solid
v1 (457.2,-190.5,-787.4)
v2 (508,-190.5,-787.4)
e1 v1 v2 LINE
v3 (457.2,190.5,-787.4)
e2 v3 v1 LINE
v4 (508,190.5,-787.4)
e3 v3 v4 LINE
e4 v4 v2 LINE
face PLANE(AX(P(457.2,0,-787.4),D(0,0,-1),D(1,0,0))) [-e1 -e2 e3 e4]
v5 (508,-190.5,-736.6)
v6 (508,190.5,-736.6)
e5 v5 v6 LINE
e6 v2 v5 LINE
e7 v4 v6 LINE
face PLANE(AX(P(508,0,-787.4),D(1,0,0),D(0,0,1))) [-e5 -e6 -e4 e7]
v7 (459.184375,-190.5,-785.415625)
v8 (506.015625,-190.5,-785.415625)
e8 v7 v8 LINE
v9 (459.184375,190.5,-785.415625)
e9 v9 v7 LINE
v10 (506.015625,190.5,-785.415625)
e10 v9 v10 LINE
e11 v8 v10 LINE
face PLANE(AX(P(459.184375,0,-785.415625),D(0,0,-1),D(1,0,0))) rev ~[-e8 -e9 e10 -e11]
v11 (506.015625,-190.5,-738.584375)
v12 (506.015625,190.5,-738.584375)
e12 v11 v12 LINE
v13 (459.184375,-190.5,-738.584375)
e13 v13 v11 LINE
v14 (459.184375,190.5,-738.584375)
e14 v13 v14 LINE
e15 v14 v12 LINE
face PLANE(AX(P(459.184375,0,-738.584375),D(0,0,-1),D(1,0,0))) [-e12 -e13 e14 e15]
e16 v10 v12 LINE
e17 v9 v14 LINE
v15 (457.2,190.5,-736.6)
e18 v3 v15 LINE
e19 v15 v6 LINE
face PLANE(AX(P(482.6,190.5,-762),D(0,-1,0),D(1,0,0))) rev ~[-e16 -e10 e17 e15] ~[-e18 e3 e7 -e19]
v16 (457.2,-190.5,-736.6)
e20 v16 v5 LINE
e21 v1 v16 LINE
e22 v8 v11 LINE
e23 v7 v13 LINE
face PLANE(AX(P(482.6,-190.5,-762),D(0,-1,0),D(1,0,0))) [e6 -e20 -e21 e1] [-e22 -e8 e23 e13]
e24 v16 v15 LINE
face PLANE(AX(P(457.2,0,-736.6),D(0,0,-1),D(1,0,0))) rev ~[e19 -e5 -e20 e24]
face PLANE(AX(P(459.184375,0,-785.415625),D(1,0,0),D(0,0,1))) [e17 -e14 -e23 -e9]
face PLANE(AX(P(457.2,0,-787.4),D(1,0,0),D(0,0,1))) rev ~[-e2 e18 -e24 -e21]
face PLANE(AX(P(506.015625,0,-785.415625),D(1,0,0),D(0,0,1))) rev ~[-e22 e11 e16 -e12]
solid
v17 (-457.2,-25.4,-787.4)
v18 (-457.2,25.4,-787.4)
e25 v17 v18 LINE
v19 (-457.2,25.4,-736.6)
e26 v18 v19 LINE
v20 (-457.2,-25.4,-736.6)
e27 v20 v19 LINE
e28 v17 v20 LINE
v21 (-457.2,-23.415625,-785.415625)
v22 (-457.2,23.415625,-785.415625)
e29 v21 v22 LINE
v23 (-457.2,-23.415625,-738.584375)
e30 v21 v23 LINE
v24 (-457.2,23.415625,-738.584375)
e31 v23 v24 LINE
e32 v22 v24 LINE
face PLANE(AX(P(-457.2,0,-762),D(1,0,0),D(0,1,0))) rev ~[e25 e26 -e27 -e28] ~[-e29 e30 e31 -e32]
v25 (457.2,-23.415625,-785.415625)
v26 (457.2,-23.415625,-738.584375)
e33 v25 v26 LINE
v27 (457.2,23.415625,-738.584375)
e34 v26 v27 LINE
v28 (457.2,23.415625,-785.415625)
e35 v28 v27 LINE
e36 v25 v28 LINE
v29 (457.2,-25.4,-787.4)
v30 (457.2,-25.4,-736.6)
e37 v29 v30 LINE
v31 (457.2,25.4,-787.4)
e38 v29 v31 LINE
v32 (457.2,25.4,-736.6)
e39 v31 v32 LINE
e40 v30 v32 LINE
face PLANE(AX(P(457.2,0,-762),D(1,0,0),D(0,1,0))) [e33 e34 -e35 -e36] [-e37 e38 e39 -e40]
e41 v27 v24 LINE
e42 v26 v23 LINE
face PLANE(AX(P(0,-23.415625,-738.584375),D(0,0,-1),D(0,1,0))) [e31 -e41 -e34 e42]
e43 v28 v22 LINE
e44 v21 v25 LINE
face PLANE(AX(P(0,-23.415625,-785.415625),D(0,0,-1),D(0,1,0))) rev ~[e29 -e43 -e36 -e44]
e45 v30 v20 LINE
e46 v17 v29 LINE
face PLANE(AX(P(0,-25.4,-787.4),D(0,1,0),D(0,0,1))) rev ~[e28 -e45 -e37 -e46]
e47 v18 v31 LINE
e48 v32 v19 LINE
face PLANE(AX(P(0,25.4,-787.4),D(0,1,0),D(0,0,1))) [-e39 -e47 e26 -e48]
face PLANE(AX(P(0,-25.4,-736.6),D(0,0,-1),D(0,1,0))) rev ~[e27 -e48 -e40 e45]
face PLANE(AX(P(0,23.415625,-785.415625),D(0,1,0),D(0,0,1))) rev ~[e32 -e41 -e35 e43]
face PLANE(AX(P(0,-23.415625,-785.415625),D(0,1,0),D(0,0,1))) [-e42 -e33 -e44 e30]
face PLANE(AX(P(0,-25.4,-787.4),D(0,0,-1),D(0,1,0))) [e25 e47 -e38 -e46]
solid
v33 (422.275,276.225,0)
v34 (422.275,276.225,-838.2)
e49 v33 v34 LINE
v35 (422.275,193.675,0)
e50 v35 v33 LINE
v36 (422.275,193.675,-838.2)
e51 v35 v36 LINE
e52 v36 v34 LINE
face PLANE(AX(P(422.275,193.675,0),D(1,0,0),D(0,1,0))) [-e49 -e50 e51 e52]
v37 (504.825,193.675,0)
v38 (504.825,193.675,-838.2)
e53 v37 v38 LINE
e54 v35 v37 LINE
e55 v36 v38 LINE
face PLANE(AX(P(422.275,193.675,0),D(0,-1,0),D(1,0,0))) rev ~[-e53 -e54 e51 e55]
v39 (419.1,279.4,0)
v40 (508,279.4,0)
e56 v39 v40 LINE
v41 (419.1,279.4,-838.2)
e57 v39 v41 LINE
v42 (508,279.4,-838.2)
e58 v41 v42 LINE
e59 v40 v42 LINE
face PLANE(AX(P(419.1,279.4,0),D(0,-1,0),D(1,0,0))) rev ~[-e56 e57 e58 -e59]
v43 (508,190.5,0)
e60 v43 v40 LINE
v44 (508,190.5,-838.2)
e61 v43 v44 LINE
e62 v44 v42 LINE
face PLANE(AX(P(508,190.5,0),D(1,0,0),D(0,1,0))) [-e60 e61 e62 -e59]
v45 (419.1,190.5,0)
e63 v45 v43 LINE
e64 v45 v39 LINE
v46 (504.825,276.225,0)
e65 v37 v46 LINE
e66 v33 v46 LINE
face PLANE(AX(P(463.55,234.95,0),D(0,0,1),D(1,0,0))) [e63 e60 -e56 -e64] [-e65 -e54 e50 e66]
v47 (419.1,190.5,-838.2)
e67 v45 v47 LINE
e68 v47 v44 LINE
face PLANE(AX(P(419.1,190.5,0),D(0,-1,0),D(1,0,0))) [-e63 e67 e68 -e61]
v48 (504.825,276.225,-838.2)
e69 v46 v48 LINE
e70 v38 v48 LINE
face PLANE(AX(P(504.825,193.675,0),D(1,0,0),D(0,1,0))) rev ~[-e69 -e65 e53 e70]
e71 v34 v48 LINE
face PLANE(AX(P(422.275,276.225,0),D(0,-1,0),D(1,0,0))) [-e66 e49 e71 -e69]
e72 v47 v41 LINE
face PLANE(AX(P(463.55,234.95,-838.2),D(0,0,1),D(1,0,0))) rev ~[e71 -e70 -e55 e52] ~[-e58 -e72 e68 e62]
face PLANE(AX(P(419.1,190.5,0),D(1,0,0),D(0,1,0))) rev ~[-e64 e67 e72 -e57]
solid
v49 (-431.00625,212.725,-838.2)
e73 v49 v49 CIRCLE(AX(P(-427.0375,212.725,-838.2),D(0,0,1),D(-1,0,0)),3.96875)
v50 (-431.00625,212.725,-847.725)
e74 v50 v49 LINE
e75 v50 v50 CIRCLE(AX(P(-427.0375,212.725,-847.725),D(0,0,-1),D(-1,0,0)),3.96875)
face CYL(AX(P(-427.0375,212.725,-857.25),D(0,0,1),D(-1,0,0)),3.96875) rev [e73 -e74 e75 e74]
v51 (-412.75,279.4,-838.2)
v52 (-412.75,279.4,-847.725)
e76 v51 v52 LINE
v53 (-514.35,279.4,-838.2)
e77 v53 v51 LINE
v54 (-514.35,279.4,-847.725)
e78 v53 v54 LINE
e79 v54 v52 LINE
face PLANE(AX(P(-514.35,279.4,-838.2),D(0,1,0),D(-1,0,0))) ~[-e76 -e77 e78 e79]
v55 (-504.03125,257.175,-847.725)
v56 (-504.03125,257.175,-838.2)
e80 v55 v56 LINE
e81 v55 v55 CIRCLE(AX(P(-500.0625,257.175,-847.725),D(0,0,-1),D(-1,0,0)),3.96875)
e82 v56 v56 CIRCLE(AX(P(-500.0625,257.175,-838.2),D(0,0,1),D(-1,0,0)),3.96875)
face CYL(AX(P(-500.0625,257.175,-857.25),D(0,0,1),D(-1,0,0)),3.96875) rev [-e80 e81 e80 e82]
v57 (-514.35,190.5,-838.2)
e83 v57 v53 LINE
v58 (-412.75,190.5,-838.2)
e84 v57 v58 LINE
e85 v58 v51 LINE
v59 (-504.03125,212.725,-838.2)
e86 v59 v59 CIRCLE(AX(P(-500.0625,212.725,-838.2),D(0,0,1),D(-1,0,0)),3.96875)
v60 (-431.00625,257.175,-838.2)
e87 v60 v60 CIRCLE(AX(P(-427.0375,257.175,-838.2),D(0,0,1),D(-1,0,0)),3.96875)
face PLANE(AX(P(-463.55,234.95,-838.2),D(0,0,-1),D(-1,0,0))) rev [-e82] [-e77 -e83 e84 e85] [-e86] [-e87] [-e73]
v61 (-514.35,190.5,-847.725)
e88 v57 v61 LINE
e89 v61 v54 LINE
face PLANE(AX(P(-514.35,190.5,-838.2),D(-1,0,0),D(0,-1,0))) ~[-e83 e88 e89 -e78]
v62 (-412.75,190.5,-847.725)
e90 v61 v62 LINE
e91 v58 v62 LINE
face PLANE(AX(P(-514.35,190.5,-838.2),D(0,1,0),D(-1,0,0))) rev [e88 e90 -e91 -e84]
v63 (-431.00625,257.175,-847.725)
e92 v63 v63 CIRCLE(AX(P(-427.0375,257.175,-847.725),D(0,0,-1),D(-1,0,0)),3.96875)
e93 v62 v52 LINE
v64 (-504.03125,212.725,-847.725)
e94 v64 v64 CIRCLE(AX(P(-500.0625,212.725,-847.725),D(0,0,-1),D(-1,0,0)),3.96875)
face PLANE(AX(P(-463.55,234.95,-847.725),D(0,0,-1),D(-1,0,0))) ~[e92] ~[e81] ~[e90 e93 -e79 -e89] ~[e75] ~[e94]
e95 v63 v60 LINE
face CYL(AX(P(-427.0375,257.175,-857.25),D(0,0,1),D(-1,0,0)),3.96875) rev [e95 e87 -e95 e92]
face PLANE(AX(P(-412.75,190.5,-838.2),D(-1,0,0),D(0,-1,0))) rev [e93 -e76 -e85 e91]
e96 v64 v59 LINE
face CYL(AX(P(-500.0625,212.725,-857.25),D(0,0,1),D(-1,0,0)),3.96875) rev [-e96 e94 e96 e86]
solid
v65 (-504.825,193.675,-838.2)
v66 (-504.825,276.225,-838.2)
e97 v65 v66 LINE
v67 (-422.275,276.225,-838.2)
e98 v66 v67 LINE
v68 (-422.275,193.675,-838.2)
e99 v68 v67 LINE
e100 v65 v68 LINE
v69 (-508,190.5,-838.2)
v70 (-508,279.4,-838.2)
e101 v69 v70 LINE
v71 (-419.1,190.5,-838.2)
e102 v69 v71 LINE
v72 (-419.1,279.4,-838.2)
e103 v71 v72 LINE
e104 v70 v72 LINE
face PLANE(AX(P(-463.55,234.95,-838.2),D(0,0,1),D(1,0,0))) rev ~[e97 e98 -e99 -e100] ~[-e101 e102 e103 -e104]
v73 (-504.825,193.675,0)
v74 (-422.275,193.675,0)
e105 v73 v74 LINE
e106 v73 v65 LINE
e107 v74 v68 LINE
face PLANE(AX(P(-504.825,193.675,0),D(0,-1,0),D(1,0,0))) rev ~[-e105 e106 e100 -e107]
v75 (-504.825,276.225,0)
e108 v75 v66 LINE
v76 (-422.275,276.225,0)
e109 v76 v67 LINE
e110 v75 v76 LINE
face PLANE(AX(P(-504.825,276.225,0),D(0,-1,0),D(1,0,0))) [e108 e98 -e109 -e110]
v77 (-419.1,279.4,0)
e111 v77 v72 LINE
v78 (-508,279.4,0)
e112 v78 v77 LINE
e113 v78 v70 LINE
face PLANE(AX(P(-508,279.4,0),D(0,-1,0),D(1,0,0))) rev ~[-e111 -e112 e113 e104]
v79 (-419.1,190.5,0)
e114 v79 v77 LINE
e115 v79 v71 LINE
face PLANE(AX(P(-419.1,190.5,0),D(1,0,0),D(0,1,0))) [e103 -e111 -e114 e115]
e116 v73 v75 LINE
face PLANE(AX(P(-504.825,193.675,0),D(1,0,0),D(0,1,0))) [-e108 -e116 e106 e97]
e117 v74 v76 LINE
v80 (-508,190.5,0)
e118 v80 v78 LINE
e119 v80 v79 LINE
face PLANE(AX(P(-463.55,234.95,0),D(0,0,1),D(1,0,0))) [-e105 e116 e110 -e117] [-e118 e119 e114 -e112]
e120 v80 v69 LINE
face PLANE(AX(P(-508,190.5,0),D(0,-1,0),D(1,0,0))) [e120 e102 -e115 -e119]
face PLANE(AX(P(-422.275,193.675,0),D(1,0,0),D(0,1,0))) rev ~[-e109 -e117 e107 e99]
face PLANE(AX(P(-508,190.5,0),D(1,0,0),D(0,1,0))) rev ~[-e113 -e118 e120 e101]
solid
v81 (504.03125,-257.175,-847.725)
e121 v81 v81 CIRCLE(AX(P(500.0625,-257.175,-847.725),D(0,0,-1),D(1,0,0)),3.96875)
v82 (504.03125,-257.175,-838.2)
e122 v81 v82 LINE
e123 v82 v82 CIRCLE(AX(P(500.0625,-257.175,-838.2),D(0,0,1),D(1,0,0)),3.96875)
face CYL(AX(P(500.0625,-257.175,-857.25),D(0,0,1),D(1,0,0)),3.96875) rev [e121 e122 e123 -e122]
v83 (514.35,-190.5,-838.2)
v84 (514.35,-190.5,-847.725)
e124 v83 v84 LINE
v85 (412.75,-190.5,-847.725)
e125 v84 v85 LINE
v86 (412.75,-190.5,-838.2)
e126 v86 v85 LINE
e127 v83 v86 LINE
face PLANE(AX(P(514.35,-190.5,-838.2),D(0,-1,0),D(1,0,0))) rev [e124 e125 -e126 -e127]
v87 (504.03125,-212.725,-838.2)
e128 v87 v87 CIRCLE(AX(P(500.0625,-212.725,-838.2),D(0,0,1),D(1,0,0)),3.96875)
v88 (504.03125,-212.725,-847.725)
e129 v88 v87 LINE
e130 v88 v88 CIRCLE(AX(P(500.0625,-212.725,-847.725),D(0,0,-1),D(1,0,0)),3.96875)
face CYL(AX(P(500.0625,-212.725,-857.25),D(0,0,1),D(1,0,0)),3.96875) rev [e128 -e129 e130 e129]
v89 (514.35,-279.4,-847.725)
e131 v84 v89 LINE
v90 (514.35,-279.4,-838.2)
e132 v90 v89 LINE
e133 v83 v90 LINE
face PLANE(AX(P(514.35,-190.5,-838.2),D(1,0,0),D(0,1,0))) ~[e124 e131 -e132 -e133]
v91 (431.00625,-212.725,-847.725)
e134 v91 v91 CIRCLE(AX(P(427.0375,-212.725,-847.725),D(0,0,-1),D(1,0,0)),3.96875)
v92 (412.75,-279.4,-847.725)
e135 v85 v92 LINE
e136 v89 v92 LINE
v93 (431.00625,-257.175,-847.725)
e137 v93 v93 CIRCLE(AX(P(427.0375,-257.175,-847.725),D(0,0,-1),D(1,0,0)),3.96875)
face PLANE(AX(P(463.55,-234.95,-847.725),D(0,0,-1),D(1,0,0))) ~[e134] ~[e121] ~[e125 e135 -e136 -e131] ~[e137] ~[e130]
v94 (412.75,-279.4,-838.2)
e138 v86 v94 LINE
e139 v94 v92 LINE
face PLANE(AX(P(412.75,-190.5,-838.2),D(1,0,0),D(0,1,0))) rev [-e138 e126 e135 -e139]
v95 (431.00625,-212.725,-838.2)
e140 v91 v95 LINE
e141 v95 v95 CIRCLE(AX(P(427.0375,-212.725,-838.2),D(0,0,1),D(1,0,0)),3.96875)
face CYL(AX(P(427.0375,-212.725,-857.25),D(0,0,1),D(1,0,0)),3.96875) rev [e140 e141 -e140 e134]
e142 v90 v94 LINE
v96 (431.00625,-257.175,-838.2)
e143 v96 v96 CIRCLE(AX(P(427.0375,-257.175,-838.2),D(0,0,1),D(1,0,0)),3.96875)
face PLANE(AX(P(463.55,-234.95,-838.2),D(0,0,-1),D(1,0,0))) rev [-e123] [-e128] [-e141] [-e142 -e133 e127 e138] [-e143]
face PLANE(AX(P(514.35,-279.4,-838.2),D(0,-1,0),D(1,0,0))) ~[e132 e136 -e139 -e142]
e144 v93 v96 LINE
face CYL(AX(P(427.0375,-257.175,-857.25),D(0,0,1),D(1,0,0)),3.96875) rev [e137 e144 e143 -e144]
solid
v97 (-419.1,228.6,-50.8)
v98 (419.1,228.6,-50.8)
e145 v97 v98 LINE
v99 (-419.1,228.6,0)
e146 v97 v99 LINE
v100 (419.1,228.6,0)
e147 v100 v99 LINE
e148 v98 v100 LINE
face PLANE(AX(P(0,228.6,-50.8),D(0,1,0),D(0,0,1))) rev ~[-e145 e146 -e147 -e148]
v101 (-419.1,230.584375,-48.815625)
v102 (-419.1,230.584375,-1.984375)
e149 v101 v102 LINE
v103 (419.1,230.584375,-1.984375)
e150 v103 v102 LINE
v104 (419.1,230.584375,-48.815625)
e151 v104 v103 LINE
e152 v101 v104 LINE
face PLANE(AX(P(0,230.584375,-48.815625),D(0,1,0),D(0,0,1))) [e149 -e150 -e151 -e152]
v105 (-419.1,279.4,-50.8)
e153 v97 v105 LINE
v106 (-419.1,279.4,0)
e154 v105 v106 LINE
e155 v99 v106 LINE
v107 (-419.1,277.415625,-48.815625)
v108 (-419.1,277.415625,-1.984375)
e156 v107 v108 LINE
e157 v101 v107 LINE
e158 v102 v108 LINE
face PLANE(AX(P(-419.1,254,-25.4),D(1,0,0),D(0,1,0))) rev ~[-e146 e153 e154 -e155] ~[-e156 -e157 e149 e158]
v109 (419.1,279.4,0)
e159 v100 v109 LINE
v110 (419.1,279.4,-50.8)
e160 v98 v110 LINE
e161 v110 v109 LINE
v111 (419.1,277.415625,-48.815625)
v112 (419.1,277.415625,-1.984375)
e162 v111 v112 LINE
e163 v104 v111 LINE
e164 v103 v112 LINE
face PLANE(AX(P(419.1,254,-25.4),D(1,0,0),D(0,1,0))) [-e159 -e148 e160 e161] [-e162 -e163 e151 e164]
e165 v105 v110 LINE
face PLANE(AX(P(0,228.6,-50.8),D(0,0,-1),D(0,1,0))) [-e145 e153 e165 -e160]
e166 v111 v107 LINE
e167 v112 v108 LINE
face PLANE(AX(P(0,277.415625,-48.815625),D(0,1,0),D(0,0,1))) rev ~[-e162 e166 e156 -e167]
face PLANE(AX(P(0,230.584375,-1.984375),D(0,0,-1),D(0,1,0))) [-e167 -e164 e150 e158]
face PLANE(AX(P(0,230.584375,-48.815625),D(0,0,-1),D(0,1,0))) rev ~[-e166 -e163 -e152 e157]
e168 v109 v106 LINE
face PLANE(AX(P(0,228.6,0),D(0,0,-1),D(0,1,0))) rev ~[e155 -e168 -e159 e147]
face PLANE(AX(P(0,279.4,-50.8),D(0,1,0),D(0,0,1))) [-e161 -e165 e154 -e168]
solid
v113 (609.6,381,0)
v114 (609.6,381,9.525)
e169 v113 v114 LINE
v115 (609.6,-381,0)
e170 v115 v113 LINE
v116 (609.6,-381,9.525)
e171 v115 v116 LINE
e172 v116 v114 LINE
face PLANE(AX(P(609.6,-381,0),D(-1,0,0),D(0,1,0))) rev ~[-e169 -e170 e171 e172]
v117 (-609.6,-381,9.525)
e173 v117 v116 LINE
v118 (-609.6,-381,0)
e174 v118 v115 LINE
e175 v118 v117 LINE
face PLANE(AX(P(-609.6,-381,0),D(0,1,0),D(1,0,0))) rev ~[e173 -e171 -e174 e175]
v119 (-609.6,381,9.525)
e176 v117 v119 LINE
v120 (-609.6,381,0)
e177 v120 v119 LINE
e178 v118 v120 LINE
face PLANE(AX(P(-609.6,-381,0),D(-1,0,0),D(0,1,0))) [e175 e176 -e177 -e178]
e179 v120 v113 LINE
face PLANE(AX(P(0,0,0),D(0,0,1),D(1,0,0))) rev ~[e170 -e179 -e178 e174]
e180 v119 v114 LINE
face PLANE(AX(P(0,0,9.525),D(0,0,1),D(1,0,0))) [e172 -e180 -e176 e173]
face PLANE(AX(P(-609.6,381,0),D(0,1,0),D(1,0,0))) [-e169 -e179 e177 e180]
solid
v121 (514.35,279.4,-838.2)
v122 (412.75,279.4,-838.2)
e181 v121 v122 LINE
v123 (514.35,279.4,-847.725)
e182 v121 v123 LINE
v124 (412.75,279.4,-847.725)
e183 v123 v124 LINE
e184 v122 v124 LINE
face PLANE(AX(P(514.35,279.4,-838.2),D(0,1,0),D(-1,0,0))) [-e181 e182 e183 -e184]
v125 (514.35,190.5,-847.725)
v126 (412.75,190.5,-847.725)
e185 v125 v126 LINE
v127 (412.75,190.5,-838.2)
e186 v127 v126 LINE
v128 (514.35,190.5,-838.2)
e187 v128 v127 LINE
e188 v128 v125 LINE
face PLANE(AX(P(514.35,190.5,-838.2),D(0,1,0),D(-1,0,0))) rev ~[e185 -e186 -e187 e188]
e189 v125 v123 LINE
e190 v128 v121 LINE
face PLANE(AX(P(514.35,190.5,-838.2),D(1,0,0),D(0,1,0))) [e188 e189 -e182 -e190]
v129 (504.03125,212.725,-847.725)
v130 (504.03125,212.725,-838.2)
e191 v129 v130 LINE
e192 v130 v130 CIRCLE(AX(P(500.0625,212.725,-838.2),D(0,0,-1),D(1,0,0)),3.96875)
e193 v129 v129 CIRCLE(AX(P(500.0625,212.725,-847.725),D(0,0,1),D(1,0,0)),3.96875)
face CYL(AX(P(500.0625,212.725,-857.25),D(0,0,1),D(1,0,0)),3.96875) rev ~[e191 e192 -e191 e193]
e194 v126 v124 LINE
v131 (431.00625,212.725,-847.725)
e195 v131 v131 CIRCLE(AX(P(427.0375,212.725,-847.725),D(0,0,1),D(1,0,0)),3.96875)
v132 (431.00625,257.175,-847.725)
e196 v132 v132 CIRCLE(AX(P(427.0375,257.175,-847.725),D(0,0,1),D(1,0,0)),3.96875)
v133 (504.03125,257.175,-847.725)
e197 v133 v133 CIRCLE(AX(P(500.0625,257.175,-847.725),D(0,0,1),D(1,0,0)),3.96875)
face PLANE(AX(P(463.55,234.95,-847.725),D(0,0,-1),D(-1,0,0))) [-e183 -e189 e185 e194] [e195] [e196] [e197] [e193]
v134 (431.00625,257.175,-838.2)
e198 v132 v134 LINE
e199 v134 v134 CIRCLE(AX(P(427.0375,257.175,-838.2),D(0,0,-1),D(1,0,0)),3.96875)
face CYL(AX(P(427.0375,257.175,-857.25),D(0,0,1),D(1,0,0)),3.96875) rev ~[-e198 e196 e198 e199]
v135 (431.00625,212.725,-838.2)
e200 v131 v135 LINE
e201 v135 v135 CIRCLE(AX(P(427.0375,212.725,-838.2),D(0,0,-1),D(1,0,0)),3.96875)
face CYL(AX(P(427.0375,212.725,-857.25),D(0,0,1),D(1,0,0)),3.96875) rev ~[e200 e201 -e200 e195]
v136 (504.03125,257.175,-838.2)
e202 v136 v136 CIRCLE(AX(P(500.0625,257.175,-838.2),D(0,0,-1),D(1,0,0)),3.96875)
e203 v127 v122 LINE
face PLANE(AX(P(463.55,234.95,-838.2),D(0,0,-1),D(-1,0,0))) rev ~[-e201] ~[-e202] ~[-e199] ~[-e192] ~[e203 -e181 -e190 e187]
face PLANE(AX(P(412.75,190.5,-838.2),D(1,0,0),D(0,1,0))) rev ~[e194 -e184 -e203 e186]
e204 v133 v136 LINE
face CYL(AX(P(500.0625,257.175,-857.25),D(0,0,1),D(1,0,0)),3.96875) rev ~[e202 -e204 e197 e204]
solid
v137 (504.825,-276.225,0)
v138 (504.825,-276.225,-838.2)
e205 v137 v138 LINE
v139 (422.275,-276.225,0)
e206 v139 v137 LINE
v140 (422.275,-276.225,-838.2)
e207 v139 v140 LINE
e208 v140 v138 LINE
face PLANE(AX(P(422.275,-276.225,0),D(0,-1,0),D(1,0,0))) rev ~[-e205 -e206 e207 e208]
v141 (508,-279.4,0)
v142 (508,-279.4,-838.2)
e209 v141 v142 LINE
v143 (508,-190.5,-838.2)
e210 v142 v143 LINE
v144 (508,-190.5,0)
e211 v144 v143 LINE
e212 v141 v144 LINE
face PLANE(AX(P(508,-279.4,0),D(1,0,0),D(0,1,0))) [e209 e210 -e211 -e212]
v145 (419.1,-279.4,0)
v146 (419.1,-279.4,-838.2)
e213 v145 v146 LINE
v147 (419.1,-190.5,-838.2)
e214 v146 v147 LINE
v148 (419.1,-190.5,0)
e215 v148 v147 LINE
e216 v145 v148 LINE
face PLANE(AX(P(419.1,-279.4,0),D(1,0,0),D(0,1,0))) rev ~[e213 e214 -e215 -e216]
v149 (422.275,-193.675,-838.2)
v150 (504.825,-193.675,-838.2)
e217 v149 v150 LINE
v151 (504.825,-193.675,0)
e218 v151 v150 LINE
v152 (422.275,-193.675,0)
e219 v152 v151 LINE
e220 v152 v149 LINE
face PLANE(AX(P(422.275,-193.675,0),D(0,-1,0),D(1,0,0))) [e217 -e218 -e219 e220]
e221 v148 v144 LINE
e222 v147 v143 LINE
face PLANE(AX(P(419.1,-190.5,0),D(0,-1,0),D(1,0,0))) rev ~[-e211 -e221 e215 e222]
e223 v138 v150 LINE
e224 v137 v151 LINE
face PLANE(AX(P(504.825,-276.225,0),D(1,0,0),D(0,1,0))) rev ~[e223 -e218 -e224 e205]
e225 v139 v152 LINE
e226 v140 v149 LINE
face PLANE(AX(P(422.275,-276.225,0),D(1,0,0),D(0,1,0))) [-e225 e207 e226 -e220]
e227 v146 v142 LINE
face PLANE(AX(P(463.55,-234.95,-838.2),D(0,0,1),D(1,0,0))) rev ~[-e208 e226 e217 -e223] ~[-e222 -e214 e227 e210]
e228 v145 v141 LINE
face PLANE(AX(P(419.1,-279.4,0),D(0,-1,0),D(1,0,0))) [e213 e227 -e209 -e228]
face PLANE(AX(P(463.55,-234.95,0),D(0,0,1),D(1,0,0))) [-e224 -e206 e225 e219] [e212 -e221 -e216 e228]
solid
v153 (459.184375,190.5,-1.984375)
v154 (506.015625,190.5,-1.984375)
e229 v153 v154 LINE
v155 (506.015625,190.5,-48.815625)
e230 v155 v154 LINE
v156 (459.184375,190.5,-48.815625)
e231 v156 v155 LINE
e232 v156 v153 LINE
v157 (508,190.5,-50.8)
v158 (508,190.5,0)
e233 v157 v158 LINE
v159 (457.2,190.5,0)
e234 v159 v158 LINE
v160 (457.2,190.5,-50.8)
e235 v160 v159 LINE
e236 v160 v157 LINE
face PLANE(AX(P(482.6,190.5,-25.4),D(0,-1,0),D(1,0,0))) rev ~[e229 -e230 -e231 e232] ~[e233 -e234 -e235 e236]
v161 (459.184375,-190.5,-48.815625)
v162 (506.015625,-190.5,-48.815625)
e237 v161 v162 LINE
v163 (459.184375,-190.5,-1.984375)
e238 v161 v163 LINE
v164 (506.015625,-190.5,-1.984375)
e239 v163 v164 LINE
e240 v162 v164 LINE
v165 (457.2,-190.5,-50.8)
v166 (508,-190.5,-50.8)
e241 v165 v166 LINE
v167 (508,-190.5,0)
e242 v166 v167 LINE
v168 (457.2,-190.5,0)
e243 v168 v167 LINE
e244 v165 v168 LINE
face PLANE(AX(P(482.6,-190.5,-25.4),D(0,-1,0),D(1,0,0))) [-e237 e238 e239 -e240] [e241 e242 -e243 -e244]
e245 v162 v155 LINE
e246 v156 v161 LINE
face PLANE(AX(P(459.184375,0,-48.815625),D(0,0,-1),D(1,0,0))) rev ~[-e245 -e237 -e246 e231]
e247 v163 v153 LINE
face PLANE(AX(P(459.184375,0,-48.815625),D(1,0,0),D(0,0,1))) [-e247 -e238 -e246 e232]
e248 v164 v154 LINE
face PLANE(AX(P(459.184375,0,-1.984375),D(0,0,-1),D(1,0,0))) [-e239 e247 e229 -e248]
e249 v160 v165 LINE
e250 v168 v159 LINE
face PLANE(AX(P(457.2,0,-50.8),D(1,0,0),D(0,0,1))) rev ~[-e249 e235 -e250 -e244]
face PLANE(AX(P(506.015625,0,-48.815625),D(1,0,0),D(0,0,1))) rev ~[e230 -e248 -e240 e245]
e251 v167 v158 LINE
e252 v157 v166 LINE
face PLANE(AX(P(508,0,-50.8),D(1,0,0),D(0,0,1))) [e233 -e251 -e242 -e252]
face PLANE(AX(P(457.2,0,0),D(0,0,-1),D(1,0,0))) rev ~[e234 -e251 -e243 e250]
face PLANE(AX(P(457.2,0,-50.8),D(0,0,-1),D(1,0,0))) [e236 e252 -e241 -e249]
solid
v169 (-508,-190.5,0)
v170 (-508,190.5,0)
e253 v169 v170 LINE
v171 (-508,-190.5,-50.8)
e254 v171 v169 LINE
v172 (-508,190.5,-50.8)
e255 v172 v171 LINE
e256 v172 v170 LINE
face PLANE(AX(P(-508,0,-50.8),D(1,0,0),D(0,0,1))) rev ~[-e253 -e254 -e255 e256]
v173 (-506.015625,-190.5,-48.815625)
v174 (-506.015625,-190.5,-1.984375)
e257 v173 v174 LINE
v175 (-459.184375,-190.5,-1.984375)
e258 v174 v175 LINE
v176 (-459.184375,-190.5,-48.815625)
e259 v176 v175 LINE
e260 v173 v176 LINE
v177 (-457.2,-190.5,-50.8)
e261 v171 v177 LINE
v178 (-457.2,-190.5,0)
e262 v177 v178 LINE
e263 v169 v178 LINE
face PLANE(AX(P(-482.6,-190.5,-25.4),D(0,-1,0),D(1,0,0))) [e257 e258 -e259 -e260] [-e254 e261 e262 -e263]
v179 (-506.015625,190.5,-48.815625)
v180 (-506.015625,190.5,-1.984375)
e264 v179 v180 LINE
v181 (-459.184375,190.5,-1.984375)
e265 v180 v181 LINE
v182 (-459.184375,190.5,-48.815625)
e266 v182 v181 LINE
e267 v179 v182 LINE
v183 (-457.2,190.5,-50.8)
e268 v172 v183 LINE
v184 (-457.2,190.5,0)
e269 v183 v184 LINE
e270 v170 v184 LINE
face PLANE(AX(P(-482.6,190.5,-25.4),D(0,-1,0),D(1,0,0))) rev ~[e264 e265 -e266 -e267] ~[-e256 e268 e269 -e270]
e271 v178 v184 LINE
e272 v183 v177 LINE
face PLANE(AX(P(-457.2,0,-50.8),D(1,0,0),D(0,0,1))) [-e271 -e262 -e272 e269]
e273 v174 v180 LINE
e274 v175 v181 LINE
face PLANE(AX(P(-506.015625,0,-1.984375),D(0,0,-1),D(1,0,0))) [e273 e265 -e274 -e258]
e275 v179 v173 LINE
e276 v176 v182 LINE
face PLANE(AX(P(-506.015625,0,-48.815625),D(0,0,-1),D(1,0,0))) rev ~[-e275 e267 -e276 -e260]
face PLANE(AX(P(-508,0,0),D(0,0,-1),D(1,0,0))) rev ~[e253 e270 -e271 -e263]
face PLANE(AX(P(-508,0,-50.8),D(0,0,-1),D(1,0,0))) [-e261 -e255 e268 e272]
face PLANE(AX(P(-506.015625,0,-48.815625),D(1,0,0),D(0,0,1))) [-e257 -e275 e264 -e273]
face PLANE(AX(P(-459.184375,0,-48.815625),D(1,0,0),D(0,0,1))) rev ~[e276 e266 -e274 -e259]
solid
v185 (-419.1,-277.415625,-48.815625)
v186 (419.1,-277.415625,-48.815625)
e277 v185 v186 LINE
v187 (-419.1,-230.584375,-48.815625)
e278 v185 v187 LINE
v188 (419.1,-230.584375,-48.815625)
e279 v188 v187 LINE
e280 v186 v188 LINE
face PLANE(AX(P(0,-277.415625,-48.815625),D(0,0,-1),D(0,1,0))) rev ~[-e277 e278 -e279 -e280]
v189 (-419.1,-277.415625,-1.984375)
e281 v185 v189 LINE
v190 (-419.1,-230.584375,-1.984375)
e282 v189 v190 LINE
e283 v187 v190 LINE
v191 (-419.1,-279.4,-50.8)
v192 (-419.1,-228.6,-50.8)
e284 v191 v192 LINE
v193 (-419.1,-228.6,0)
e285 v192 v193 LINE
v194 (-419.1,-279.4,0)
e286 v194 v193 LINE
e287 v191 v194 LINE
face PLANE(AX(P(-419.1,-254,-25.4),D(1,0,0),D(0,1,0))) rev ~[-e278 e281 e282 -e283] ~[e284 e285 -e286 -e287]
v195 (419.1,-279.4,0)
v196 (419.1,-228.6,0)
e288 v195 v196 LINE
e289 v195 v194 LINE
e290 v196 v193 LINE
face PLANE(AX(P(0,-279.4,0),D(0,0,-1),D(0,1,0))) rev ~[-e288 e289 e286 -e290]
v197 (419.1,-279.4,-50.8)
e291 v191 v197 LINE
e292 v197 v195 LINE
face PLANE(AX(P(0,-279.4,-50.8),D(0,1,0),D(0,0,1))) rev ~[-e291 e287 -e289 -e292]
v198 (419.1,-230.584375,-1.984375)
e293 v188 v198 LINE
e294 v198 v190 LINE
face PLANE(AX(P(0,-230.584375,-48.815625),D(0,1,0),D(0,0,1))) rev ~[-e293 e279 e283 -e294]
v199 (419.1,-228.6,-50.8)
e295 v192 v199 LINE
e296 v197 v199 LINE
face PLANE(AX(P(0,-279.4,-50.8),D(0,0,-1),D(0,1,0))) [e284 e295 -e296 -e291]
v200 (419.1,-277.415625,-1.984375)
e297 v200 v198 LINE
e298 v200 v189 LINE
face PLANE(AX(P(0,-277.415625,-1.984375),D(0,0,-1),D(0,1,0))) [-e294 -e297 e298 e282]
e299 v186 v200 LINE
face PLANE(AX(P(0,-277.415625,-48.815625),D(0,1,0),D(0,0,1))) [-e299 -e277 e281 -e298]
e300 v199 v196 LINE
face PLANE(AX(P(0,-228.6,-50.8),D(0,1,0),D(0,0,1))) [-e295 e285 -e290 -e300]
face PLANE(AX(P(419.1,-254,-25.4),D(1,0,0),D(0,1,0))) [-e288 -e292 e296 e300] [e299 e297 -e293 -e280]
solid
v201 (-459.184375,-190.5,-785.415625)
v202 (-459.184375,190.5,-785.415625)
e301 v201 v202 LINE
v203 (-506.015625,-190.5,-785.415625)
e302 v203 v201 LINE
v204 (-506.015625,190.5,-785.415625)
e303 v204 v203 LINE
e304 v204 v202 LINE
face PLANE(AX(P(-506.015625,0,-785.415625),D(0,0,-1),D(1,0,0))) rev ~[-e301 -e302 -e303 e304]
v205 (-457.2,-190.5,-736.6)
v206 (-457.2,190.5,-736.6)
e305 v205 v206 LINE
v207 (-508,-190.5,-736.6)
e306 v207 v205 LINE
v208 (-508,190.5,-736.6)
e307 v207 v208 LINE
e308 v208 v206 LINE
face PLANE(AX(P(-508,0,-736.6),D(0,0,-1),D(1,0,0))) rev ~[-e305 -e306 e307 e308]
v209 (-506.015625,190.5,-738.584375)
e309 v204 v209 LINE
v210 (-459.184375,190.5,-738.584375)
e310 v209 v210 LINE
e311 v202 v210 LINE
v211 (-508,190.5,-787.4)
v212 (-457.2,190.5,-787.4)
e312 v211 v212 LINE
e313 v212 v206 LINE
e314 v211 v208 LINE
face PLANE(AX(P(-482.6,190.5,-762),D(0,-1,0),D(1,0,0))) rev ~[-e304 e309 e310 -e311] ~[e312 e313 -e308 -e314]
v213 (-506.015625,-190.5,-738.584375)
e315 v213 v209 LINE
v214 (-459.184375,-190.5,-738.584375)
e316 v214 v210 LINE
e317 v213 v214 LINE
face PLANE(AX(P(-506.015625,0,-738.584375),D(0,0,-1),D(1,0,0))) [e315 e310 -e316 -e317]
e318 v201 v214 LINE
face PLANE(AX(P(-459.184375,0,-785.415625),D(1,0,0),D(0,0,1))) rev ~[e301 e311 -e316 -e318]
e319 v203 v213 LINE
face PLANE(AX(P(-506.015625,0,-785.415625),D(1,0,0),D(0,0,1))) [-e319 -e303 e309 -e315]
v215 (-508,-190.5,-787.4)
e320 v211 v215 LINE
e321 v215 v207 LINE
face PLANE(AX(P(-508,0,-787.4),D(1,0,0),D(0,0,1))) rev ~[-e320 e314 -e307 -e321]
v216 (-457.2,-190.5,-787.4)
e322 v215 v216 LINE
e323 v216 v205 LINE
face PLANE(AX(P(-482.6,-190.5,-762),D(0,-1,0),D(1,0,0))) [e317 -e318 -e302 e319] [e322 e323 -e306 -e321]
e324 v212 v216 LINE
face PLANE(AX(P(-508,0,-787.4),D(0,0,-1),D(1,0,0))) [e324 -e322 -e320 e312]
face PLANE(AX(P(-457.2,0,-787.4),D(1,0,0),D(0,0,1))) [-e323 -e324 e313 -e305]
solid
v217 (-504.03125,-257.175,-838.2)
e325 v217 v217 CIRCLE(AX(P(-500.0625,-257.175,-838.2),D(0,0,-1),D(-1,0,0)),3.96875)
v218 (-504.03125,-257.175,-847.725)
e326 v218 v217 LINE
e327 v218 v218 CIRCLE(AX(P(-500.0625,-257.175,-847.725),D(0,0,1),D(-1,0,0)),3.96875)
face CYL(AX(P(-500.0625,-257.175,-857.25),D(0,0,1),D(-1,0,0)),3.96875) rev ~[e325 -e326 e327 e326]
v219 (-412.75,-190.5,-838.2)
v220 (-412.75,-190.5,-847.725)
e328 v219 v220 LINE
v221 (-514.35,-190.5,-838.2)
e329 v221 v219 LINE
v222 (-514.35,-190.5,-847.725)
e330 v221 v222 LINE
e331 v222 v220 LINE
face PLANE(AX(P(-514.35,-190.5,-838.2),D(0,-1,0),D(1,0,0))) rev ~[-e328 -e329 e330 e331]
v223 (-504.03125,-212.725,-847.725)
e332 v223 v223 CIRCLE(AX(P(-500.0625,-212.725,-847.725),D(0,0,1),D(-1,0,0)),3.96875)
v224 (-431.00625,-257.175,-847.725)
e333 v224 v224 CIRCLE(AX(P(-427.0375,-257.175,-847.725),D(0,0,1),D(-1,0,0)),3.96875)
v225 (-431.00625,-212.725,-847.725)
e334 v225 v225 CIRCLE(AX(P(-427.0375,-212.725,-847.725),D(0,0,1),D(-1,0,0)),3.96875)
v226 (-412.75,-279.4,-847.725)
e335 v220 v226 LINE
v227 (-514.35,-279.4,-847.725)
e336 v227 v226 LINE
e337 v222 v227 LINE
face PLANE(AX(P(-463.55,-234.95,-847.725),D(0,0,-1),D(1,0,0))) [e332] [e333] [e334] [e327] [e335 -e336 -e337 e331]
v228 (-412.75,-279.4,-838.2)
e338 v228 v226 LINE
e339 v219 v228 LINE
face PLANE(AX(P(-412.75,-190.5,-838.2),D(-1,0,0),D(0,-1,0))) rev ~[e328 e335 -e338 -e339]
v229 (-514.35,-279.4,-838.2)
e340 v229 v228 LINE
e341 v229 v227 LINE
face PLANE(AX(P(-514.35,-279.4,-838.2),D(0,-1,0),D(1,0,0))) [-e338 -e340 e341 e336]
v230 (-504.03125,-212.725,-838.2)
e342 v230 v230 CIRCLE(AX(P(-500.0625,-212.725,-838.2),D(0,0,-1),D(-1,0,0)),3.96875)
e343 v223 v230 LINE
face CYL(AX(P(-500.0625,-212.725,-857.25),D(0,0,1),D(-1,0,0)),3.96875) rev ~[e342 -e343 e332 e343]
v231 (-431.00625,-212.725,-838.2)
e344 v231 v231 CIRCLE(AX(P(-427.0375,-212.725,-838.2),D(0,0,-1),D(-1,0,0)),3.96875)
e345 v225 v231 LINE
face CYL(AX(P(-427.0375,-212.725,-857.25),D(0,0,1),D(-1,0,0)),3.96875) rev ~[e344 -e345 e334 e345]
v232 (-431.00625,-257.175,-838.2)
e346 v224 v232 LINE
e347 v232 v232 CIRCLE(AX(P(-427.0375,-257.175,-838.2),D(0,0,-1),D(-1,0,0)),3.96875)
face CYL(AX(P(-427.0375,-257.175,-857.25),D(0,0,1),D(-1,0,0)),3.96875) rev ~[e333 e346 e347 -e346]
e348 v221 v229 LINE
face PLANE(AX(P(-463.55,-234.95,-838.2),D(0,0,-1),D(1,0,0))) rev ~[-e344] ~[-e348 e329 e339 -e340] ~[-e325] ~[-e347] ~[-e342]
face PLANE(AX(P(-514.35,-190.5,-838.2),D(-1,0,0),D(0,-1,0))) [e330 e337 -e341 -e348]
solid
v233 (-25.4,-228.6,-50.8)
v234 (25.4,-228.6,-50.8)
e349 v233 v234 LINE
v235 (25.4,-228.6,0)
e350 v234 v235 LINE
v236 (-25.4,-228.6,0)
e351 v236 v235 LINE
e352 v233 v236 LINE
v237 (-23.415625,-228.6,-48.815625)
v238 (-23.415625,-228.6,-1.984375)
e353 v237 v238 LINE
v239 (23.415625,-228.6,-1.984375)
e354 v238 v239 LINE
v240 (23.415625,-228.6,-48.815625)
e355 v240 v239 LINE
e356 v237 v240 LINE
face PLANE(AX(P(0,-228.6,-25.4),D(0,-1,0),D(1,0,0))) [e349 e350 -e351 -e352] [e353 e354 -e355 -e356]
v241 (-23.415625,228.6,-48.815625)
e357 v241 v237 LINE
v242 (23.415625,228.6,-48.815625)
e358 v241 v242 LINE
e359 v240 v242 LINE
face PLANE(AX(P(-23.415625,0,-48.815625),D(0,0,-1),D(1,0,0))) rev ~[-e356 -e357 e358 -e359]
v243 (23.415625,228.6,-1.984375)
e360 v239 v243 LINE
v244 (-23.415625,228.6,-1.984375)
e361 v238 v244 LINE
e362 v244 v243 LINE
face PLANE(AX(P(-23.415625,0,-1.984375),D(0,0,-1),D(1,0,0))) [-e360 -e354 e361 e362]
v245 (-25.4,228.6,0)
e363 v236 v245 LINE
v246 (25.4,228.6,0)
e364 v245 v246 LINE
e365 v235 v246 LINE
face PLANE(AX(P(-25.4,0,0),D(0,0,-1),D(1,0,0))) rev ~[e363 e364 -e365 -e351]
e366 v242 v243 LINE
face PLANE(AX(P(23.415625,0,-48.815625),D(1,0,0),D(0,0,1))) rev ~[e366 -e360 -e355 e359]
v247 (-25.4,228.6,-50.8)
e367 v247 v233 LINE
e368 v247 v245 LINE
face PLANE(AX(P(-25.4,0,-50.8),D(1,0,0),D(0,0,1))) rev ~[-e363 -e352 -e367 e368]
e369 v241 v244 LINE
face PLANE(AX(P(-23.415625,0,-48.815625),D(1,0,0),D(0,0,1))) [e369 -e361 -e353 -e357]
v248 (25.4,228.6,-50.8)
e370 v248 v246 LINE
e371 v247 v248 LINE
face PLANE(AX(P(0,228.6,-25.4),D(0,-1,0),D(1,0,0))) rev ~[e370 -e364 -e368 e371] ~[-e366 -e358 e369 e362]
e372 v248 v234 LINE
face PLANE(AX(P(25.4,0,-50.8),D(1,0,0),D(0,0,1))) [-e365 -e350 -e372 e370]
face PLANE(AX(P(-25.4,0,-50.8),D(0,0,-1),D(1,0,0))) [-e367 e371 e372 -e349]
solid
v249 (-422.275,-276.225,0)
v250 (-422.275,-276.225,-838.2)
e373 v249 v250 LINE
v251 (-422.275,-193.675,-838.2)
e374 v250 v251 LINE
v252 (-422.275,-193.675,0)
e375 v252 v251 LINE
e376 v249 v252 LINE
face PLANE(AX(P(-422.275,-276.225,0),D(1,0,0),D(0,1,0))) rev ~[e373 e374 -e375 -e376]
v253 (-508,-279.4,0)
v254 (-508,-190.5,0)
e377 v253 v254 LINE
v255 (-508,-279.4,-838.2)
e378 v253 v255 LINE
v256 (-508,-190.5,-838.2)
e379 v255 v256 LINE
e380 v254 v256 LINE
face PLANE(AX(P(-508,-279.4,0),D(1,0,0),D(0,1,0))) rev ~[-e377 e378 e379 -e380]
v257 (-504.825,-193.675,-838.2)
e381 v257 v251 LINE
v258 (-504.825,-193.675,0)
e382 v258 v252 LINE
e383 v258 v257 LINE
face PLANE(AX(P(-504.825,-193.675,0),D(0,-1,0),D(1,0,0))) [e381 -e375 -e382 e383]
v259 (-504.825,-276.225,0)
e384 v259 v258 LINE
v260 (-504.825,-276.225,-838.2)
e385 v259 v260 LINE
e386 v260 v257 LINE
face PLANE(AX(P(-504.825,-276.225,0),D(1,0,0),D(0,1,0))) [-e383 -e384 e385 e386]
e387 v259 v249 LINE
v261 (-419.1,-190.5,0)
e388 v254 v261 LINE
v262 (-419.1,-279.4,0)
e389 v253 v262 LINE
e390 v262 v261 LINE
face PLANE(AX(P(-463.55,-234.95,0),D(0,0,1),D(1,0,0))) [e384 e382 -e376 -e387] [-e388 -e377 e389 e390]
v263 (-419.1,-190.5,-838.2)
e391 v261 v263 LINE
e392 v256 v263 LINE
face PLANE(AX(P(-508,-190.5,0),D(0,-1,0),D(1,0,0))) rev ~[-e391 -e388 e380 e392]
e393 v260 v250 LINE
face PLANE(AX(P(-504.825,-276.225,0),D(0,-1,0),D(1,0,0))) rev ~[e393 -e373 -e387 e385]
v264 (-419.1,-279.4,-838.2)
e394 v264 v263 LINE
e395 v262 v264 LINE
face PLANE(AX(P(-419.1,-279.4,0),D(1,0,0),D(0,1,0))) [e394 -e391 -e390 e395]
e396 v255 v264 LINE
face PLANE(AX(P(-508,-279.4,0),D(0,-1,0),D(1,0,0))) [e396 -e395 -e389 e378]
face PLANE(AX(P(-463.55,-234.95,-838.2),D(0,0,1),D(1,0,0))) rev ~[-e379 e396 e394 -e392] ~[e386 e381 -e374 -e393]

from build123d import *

# Parameters (mm, degrees)
F0_W           = 88.9
F0_H           = 88.9
F0_W_2         = 82.55
F0_H_2         = 82.55
F1_DEPTH       = 838.2
F2_W           = 50.8
F2_H           = 50.8
F2_W_2         = 46.83125
F2_H_2         = 46.83125
F3_DEPTH       = 419.1
F3_DEPTH_BACK  = 419.1
F4_W           = 50.8
F4_H           = 50.8
F4_W_2         = 46.83125
F4_H_2         = 46.83125
F5_DEPTH       = 190.5
F5_DEPTH_BACK  = 190.5
F6_W           = 50.8
F6_H           = 50.8
F6_W_2         = 46.83125
F6_H_2         = 46.83125
F7_DEPTH       = 457.2
F7_DEPTH_BACK  = 457.2
F8_W           = 1219.2
F8_H           = 762
F9_DEPTH       = 9.525
F11_W          = 101.6
F11_H          = 88.9
F12_DEPTH      = 9.525
F15_D          = 7.9375
F15_DEPTH      = 9.525
F15_TIP        = 2.3846655818
F18_W          = 50.8
F18_H          = 50.8
F18_W_2        = 46.83125
F18_H_2        = 46.83125
F19_DEPTH      = 228.6
F19_DEPTH_BACK = 228.6


# Not quite as in the source:
# - a length typed as a fraction of an inch, garbled in the dataset ("3 / 203.2 mm" for 3/8 in), is restored


with BuildPart() as f1:
    # F0 (on Top) → F1 (new body)
    with BuildSketch(Plane.XY):
        with Locations((463.55, -234.95)):
            Rectangle(F0_W, F0_H)
        with Locations((463.55, -234.95)):
            Rectangle(F0_W_2, F0_H_2, mode=Mode.SUBTRACT)
    extrude(amount=-F1_DEPTH)


with BuildPart() as f1b:
    # F0 (on Top) → F1, piece 2 (new body)
    with BuildSketch(Plane.XY):
        with Locations((463.55, 234.95)):
            Rectangle(F0_W, F0_H)
        with Locations((463.55, 234.95)):
            Rectangle(F0_W_2, F0_H_2, mode=Mode.SUBTRACT)
    extrude(amount=-F1_DEPTH)


with BuildPart() as f1c:
    # F0 (on Top) → F1, piece 3 (new body)
    with BuildSketch(Plane.XY):
        with Locations((-463.55, -234.95)):
            Rectangle(F0_W, F0_H)
        with Locations((-463.55, -234.95)):
            Rectangle(F0_W_2, F0_H_2, mode=Mode.SUBTRACT)
    extrude(amount=-F1_DEPTH)


with BuildPart() as f1d:
    # F0 (on Top) → F1, piece 4 (new body)
    with BuildSketch(Plane.XY):
        with Locations((-463.55, 234.95)):
            Rectangle(F0_W, F0_H)
        with Locations((-463.55, 234.95)):
            Rectangle(F0_W_2, F0_H_2, mode=Mode.SUBTRACT)
    extrude(amount=-F1_DEPTH)


with BuildPart() as f3:
    # F2 (on Right) → F3 (new body, two sides)
    with BuildSketch(Plane.YZ) as f3_sk:
        with Locations((-254, -25.4)):
            Rectangle(F2_W, F2_H)
        with Locations((-254, -25.4)):
            Rectangle(F2_W_2, F2_H_2, mode=Mode.SUBTRACT)
    extrude(amount=F3_DEPTH)
    extrude(f3_sk.sketch, amount=-F3_DEPTH_BACK)


with BuildPart() as f3b:
    # F2 (on Right) → F3, piece 2 (new body, two sides)
    with BuildSketch(Plane.YZ) as f3_2_sk:
        with Locations((254, -25.4)):
            Rectangle(F2_W, F2_H)
        with Locations((254, -25.4)):
            Rectangle(F2_W_2, F2_H_2, mode=Mode.SUBTRACT)
    extrude(amount=F3_DEPTH)
    extrude(f3_2_sk.sketch, amount=-F3_DEPTH_BACK)


with BuildPart() as f5:
    # F4 (on Front) → F5 (new body, two sides)
    with BuildSketch(Plane.XZ) as f5_sk:
        with Locations((-482.6, -25.4)):
            Rectangle(F4_W, F4_H)
        with Locations((-482.6, -25.4)):
            Rectangle(F4_W_2, F4_H_2, mode=Mode.SUBTRACT)
    extrude(amount=F5_DEPTH)
    extrude(f5_sk.sketch, amount=-F5_DEPTH_BACK)


with BuildPart() as f5b:
    # F4 (on Front) → F5, piece 2 (new body, two sides)
    with BuildSketch(Plane.XZ) as f5_2_sk:
        with Locations((482.6, -25.4)):
            Rectangle(F4_W, F4_H)
        with Locations((482.6, -25.4)):
            Rectangle(F4_W_2, F4_H_2, mode=Mode.SUBTRACT)
    extrude(amount=F5_DEPTH)
    extrude(f5_2_sk.sketch, amount=-F5_DEPTH_BACK)


with BuildPart() as f5c:
    # F4 (on Front) → F5, piece 3 (new body, two sides)
    with BuildSketch(Plane.XZ) as f5_3_sk:
        with Locations((-482.6, -762)):
            Rectangle(F4_W, F4_H)
        with Locations((-482.6, -762)):
            Rectangle(F4_W_2, F4_H_2, mode=Mode.SUBTRACT)
    extrude(amount=F5_DEPTH)
    extrude(f5_3_sk.sketch, amount=-F5_DEPTH_BACK)


with BuildPart() as f5d:
    # F4 (on Front) → F5, piece 4 (new body, two sides)
    with BuildSketch(Plane.XZ) as f5_4_sk:
        with Locations((482.6, -762)):
            Rectangle(F4_W, F4_H)
        with Locations((482.6, -762)):
            Rectangle(F4_W_2, F4_H_2, mode=Mode.SUBTRACT)
    extrude(amount=F5_DEPTH)
    extrude(f5_4_sk.sketch, amount=-F5_DEPTH_BACK)


with BuildPart() as f7:
    # F6 (on Right) → F7 (new body, two sides)
    with BuildSketch(Plane.YZ) as f7_sk:
        with Locations((0, -762)):
            Rectangle(F6_W, F6_H)
        with Locations((0, -762)):
            Rectangle(F6_W_2, F6_H_2, mode=Mode.SUBTRACT)
    extrude(amount=F7_DEPTH)
    extrude(f7_sk.sketch, amount=-F7_DEPTH_BACK)


with BuildPart() as f9:
    # F8 (on Top) → F9 (new body)
    with BuildSketch(Plane.XY):
        Rectangle(F8_W, F8_H)
    extrude(amount=F9_DEPTH)


with BuildPart() as f12:
    # F11 (on offset) → F12 (new body)
    with BuildSketch(Plane(origin=(0, 0, -838.2), x_dir=(1, 0, 0), z_dir=(0, 0, -1))):
        with Locations((-463.55, 234.95)):
            Rectangle(F11_W, F11_H)
    extrude(amount=F12_DEPTH)

    # F15
    with Locations(Plane(origin=(0, 0, -847.725), x_dir=(1, 0, 0), z_dir=(0, 0, -1))):
        with Locations((-500.0625, 257.175), (-500.0625, 212.725), (-427.0375, 212.725), (-427.0375, 257.175)):
            Hole(F15_D / 2, depth=F15_DEPTH)
            with Locations((0, 0, -(F15_DEPTH + F15_TIP / 2))):  # 118° drill point
                Cone(0, F15_D / 2, F15_TIP, mode=Mode.SUBTRACT)


with BuildPart() as f16_1:
    # F16: instance of F12
    add(f12.part.mirror(Plane.XZ))


with BuildPart() as f17_1:
    # F17: instance of F12
    add(f12.part.mirror(Plane.YZ))


with BuildPart() as f17_2:
    # F17: instance of F16_1
    add(f16_1.part.mirror(Plane.YZ))


with BuildPart() as f19:
    # F18 (on Front) → F19 (new body, two sides)
    with BuildSketch(Plane.XZ) as f19_sk:
        with Locations((0, -25.4)):
            Rectangle(F18_W, F18_H)
        with Locations((0, -25.4)):
            Rectangle(F18_W_2, F18_H_2, mode=Mode.SUBTRACT)
    extrude(amount=F19_DEPTH)
    extrude(f19_sk.sketch, amount=-F19_DEPTH_BACK)


solid = Compound([f1.part, f1b.part, f1c.part, f1d.part, f3.part, f3b.part, f5.part, f5b.part, f5c.part, f5d.part, f7.part, f9.part, f12.part, f16_1.part, f17_1.part, f17_2.part, f19.part])
